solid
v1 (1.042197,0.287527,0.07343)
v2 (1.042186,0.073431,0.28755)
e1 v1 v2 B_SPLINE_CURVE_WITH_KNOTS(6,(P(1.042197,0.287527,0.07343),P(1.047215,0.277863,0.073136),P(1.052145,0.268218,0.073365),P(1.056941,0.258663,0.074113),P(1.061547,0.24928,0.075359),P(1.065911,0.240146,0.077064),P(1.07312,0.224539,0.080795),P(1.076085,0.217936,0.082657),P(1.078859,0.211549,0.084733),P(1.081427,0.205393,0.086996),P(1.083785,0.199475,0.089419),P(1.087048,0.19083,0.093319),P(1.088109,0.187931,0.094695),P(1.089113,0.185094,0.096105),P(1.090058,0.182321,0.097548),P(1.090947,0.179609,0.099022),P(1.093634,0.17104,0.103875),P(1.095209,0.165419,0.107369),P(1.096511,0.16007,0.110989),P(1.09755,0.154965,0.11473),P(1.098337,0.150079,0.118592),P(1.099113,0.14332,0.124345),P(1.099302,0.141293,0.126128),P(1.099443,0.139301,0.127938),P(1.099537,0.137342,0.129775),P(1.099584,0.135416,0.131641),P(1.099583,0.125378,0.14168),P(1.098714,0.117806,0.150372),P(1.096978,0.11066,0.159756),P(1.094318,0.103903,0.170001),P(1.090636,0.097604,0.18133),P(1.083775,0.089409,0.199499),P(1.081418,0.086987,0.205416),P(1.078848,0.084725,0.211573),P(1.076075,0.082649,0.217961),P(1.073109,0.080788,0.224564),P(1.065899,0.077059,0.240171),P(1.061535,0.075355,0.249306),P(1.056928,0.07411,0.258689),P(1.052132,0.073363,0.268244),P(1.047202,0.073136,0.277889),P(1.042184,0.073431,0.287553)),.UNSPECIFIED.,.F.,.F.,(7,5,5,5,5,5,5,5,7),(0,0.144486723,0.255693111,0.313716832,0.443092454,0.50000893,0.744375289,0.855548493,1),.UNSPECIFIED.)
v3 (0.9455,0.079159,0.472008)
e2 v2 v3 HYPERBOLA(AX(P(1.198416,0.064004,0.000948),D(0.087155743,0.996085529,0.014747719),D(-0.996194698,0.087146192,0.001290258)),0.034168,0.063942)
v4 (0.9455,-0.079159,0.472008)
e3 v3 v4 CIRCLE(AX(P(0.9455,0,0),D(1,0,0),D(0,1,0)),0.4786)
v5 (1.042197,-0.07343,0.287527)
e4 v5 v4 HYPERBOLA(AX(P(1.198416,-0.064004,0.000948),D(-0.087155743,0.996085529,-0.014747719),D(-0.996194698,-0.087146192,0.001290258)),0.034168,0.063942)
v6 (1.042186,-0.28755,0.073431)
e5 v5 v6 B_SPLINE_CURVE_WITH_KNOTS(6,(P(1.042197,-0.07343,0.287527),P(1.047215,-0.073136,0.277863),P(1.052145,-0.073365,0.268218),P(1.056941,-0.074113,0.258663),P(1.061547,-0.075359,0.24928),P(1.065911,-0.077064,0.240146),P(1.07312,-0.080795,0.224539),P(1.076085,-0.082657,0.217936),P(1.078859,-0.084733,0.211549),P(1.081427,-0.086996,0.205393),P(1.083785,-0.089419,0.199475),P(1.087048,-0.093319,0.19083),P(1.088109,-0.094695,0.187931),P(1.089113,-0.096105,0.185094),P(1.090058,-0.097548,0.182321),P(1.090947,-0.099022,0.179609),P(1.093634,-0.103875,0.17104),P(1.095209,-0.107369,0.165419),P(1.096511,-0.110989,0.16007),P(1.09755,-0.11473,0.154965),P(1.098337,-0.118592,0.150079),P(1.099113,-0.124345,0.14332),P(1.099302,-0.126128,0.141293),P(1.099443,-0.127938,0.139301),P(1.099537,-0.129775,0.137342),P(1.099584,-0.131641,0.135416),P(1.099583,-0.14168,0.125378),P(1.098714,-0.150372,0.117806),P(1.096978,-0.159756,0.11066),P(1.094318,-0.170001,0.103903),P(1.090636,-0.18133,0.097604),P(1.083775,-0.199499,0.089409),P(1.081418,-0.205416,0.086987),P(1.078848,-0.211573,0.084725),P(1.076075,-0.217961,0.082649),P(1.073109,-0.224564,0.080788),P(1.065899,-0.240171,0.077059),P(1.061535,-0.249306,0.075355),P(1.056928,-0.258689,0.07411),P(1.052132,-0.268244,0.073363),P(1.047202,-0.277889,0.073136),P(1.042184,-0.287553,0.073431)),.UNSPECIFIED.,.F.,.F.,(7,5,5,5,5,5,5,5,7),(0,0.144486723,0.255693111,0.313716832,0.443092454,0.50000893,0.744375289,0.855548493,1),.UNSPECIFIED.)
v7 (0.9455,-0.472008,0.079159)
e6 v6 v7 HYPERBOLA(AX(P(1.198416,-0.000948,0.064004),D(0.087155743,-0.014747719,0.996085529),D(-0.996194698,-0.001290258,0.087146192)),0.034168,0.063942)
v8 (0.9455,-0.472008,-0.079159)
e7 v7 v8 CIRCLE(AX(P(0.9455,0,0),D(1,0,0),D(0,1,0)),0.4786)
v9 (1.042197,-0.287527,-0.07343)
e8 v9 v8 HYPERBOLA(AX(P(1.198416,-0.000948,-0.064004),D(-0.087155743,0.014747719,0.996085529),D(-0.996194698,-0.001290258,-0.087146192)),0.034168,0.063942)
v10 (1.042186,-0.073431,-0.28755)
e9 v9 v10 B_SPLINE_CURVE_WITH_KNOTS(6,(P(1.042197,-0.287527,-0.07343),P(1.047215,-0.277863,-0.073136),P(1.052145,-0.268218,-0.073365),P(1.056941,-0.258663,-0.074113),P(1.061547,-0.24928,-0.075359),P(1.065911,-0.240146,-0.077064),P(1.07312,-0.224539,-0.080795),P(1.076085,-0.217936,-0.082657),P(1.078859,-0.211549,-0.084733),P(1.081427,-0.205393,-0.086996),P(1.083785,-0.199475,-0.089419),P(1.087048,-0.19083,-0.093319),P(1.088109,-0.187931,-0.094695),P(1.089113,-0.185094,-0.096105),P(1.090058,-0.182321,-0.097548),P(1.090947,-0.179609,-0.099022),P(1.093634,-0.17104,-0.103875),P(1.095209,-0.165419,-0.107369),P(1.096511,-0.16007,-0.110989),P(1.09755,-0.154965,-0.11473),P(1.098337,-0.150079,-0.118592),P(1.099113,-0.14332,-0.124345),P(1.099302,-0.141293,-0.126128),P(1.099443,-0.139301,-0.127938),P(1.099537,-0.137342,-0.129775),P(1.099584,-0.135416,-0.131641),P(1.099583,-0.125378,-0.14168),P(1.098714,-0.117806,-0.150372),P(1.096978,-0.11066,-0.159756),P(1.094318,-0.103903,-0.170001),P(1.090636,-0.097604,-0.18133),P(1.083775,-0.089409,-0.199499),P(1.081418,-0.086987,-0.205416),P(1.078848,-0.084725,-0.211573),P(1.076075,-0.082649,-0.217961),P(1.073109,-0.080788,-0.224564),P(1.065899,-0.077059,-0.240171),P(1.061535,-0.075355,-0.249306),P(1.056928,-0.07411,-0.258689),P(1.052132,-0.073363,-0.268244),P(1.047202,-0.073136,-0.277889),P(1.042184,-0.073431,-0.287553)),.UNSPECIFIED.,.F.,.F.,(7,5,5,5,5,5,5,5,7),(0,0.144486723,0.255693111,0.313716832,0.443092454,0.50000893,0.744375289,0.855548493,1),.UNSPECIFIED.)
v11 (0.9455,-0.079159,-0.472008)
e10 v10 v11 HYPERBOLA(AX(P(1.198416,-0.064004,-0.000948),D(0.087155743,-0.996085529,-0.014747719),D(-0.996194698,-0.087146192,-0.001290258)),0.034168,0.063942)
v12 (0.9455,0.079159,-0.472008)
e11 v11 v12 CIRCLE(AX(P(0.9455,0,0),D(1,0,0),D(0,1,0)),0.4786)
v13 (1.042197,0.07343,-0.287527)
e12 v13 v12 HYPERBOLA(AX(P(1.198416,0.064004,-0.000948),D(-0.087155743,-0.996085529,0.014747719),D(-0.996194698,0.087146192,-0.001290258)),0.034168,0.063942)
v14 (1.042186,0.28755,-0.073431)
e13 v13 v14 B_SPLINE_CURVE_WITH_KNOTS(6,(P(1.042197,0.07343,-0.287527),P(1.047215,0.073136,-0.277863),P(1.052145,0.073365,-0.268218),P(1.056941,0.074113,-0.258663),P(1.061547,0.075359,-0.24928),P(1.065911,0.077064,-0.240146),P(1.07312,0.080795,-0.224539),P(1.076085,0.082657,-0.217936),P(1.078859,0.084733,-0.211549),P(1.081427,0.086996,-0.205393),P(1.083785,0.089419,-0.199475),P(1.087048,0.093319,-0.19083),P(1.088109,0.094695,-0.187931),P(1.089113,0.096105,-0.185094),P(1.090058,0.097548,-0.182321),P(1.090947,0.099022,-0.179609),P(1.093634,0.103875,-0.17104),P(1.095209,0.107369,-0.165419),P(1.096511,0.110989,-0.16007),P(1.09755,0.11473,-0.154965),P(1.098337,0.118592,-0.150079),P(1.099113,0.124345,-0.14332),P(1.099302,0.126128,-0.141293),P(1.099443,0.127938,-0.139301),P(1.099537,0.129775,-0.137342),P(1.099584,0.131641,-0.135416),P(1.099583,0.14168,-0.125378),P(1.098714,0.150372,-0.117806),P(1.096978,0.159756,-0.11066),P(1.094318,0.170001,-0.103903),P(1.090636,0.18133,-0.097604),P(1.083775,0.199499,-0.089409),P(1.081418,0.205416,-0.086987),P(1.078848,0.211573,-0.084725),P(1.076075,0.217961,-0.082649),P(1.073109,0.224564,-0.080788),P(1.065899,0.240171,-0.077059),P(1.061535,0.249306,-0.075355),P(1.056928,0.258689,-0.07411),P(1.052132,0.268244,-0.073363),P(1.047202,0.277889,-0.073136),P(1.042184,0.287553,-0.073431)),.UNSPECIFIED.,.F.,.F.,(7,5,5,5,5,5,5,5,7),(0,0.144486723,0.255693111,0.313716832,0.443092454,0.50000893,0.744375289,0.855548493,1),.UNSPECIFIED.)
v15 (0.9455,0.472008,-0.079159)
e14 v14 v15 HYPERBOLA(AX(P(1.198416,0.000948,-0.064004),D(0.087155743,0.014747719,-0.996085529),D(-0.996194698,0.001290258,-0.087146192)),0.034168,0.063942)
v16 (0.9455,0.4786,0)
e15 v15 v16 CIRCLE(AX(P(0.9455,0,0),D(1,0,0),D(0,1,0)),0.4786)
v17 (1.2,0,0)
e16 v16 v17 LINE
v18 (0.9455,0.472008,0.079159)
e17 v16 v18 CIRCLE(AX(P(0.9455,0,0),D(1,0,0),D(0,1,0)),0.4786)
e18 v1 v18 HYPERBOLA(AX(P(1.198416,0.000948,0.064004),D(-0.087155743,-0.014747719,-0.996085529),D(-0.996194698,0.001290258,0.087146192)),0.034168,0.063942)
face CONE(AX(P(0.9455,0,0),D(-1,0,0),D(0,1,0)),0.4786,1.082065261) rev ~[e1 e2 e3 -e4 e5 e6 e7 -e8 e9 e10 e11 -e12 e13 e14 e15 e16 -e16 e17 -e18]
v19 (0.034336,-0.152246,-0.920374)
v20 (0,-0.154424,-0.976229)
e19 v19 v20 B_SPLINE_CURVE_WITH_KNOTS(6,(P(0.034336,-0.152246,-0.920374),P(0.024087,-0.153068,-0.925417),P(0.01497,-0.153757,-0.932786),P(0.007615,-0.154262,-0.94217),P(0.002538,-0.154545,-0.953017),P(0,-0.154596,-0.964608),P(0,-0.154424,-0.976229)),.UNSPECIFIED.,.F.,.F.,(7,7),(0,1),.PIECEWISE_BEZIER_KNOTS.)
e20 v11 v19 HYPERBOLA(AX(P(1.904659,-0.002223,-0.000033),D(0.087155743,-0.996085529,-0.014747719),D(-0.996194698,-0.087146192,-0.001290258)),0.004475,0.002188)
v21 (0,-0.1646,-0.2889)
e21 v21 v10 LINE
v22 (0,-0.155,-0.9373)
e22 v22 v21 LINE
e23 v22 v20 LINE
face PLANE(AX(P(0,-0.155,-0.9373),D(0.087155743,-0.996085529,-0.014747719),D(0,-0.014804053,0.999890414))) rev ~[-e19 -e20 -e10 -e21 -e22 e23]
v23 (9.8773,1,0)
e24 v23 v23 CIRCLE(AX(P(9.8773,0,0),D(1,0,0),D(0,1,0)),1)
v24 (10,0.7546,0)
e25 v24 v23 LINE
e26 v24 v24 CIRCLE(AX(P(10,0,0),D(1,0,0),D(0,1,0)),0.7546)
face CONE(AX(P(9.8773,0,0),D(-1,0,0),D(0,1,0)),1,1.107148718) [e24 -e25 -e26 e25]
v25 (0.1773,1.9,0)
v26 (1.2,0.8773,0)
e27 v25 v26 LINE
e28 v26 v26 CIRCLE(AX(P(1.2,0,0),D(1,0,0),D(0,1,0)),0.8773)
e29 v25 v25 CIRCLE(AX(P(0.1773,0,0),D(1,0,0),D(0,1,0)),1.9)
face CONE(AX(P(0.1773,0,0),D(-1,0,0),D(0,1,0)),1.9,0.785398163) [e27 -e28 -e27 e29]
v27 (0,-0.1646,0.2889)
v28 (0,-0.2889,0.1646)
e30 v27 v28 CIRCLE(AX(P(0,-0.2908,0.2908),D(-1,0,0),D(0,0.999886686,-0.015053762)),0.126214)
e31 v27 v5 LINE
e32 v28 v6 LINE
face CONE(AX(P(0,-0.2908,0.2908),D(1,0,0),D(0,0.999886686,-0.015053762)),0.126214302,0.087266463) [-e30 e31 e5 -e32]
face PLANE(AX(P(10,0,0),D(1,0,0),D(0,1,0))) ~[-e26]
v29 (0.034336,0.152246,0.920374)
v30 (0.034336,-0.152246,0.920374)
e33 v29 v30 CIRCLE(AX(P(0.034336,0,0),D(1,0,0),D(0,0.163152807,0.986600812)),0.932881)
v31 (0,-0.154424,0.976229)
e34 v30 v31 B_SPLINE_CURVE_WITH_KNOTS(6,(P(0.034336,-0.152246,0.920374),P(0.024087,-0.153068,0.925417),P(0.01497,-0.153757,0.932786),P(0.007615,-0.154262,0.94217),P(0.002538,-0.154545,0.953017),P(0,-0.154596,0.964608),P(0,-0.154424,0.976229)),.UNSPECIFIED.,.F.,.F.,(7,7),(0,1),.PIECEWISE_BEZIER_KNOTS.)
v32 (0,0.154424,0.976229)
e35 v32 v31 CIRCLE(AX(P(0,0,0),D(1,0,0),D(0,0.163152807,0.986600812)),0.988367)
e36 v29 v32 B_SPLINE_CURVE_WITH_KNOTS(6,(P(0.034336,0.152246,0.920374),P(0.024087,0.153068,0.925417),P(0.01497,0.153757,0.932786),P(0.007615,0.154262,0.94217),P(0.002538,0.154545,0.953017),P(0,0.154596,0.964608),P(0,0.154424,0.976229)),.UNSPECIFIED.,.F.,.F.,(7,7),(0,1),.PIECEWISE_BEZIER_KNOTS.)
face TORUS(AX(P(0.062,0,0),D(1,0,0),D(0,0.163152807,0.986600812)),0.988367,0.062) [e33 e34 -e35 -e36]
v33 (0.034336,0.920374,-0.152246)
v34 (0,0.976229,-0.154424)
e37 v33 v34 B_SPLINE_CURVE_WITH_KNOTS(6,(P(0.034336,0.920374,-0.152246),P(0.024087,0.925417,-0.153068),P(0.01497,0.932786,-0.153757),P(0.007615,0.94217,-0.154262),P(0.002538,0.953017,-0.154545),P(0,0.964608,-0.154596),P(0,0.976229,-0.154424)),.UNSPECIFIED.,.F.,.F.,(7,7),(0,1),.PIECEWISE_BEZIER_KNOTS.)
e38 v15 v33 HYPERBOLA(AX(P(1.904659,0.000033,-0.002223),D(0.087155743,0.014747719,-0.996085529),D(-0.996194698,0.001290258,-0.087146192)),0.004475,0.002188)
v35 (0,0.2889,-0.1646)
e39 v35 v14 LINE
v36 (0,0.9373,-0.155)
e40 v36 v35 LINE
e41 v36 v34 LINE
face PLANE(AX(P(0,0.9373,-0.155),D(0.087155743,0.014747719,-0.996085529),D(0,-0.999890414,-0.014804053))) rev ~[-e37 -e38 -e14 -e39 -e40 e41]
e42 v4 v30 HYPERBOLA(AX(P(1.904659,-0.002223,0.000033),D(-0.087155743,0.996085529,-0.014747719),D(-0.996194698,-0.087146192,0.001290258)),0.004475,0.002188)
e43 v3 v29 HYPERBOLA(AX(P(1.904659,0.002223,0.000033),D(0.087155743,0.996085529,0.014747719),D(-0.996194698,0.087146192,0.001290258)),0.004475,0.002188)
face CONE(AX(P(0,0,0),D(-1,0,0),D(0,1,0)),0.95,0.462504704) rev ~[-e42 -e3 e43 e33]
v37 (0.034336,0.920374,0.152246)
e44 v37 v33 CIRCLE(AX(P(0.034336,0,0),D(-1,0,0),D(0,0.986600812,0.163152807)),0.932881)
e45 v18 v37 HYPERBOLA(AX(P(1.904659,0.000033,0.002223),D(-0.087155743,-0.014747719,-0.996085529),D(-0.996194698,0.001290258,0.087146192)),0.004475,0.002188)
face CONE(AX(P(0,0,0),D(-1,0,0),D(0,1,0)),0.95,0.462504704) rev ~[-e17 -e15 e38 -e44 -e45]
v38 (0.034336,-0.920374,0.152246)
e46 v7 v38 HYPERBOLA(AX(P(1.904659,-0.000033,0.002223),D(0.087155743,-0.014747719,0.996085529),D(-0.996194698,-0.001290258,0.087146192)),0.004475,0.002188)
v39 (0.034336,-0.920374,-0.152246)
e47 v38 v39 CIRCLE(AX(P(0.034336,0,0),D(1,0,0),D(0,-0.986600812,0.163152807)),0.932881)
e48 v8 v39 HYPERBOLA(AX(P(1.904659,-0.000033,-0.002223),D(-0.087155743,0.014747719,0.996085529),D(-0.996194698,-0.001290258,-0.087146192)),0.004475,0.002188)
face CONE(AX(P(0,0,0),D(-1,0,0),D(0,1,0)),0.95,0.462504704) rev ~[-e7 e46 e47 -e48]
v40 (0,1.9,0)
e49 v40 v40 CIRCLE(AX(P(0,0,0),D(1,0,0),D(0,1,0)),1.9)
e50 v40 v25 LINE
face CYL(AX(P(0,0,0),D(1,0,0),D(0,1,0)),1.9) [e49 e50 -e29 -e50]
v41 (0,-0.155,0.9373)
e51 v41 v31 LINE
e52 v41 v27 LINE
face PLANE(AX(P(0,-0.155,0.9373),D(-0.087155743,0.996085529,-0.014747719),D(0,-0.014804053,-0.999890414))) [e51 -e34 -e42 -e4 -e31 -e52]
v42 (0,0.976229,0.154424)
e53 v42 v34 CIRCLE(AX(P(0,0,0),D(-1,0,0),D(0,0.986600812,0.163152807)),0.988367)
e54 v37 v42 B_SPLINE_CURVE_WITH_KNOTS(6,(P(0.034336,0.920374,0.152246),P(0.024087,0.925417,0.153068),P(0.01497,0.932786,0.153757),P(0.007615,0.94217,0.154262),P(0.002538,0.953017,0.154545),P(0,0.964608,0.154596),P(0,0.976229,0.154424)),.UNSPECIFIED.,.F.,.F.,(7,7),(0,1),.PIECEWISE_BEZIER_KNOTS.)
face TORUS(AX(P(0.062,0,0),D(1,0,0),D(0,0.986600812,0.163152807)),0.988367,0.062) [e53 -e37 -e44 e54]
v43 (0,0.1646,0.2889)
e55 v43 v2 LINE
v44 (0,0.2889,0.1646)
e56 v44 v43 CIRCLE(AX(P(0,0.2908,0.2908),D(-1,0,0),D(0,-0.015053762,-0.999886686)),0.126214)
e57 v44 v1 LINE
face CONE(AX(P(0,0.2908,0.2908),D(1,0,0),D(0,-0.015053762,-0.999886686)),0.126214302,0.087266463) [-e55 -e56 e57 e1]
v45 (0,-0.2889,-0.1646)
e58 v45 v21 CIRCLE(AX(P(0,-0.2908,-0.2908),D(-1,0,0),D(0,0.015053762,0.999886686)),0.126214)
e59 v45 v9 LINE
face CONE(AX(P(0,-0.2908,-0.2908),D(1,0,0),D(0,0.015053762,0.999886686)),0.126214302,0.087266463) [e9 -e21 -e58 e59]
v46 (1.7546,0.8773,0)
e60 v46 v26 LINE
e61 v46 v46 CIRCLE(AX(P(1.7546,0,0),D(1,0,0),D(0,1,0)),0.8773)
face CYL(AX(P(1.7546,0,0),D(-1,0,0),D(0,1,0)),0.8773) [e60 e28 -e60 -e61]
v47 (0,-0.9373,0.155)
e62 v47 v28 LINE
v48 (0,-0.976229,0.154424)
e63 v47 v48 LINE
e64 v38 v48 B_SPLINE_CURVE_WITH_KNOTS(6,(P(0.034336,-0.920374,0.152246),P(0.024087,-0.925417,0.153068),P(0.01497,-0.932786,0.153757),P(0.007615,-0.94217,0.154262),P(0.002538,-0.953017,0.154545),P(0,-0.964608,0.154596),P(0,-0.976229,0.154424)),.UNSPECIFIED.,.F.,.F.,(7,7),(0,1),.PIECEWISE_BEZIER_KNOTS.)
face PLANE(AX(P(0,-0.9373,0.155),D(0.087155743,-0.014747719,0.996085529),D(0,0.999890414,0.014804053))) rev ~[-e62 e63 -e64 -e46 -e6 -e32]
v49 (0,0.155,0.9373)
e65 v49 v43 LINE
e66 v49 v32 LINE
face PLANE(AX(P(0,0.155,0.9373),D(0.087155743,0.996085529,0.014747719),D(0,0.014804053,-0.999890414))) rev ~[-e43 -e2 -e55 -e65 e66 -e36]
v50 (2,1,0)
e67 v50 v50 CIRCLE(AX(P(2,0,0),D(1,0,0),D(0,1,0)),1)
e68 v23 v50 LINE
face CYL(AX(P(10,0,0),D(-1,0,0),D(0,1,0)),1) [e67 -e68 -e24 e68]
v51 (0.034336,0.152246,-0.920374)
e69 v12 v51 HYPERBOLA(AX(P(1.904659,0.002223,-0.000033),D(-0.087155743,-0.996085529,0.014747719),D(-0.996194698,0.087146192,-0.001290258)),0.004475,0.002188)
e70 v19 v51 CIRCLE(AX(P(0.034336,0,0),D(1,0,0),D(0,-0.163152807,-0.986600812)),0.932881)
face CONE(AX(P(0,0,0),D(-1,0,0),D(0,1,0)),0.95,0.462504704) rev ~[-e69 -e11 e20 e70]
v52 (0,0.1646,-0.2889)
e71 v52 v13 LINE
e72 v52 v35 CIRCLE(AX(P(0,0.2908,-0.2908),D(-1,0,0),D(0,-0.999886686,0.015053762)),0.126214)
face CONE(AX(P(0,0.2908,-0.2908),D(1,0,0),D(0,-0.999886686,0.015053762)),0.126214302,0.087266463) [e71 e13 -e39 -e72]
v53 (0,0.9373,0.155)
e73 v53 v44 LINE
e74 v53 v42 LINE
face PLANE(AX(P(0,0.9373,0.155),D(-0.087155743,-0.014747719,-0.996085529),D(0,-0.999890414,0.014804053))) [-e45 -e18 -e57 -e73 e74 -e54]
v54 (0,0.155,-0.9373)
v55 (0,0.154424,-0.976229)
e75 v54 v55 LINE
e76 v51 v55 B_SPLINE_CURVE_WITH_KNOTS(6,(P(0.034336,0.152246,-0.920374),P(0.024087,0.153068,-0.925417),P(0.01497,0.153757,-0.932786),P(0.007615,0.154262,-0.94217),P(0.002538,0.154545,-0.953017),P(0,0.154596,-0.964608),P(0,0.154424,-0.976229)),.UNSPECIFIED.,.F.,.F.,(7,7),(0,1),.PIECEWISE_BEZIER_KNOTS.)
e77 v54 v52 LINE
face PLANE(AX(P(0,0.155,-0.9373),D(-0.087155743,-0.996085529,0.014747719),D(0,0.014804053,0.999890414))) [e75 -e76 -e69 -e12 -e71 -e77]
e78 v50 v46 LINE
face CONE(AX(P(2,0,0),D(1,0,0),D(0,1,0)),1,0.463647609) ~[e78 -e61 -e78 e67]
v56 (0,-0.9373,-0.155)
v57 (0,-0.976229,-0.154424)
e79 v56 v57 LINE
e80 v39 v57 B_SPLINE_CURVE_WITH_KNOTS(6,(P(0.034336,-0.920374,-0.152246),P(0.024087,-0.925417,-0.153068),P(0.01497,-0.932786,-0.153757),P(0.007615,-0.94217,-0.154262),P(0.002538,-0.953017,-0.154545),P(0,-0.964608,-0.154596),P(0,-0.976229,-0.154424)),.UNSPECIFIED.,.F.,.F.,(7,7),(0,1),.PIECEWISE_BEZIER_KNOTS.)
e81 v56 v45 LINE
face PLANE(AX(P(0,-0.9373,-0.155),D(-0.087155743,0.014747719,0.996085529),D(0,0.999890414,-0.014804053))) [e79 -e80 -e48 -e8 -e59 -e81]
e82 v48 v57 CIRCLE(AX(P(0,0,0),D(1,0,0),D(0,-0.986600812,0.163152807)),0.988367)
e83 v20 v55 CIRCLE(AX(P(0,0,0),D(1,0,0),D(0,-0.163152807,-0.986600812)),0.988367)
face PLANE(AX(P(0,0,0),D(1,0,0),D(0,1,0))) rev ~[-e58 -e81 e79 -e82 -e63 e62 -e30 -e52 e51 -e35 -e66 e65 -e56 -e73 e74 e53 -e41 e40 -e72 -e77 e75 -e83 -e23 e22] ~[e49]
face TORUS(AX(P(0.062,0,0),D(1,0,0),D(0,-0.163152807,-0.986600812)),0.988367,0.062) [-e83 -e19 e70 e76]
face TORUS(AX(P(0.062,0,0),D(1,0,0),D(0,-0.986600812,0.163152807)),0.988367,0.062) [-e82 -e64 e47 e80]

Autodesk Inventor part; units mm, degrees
ref_plane "YZ Plane" through (0, 0, 0) normal (1, 0, 0) x (0, 1, 0)
ref_plane "XZ Plane" through (0, 0, 0) normal (0, 1, 0) x (-1, 0, 0)
sketch "Skizze1" plane through (0, 0, 0) normal (0, 0, 1) x (1, 0, 0)
  line L0 (1.2, 0) -> (10, 0)
  line L1 (10, 0) -> (10, 1)
  line L2 (10, 1) -> (2, 1)
  line L3 (2, 1) -> (1.7546, 0.8773)
  line L4 (1.7546, 0.8773) -> (1.2, 0.8773)
  line L5 (0, 1.9) -> (0, 0.95)
  line L6 (0, 0.95) -> (0.9455, 0.4786)
  line L7 (0.9455, 0.4786) -> (1.2, 0)
  line L8 (-2, 0) -> (12, 0) projected
  line L9 (0, -0.38) -> (0, 2.28) projected
  line L10 (0, 1.9) -> (0.1773, 1.9)
  line L11 (0.1773, 1.9) -> (1.2, 0.8773)
  line L12 (2, 1) -> (1.0773, 1) construction
  dimension "d1" = 8
  dimension "d2" = 2
  dimension "d3" = 1.7546
  dimension "d4" = 1.9
  dimension "d5" = 26.5
  dimension "d6" = 62
  dimension "d7" = 1.2
  dimension "d8" = 0.2454
  dimension "d12" = 3.8
  dimension "d13" = 45
  dimension "d15" = 10
  dimension "d24" = 1.2
revolve "Körper" add sketch "Skizze1" angle 360 about axis through (1.2, 0, 0) along (1, 0, 0) contours L7 L6 L5 L10 L11 L4 L3 L2 L1 L0
sketch "Skizze2" plane through (0, 0, 0) normal (-1, 0, 0) x (0, 0, 1)
  line L0 (0, 0.95) -> (0, 0) construction
  line L1 (0, 0) -> (0.95, 0) construction
  arc A0 (0.285, 0) -> (0, 0.285) centre (0, 0) ccw construction
  arc A1 (0.3325, 0) -> (0, 0.3325) centre (0, 0) ccw construction
  arc A2 (0.9373, 0.155) -> (0.155, 0.9373) centre (0, 0) ccw
  line L2 (0, 0) -> (0.6718, 0.6718) construction
  line L3 (0.155, 0.9373) -> (0.1646, 0.2889)
  line L4 (0.9373, 0.155) -> (0.2889, 0.1646)
  arc A3 (0.155, 0.9373) -> (0, 0.95) centre (0, 0) ccw
  arc A4 (0.95, 0) -> (0.9373, 0.155) centre (0, 0) ccw
  line L5 (0, -2.66) -> (0, 2.66) projected
  line L6 (-2.66, 0) -> (2.66, 0) projected
  arc A5 (0.155, -0.9373) -> (0.9373, -0.155) centre (0, 0) ccw
  line L7 (0.155, -0.9373) -> (0.1646, -0.2889)
  line L8 (0.9373, -0.155) -> (0.2889, -0.1646)
  arc A6 (0, -0.95) -> (0.155, -0.9373) centre (0, 0) ccw
  arc A7 (0.9373, -0.155) -> (0.95, 0) centre (0, 0) ccw
  arc A8 (-0.155, 0.9373) -> (-0.9373, 0.155) centre (0, 0) ccw
  line L9 (-0.155, 0.9373) -> (-0.1646, 0.2889)
  line L10 (-0.9373, 0.155) -> (-0.2889, 0.1646)
  arc A9 (0, 0.95) -> (-0.155, 0.9373) centre (0, 0) ccw
  arc A10 (-0.9373, 0.155) -> (-0.95, 0) centre (0, 0) ccw
  arc A11 (-0.155, -0.9373) -> (0, -0.95) centre (0, 0) ccw
  arc A12 (-0.9373, -0.155) -> (-0.155, -0.9373) centre (0, 0) ccw
  arc A13 (-0.95, 0) -> (-0.9373, -0.155) centre (0, 0) ccw
  line L11 (-0.9373, -0.155) -> (-0.2889, -0.1646)
  line L12 (-0.155, -0.9373) -> (-0.1646, -0.2889)
  arc A14 (0.1646, 0.2889) -> (0.2889, 0.1646) centre (0.2908, 0.2908) ccw
  arc A15 (0.2889, -0.1646) -> (0.1646, -0.2889) centre (0.2908, -0.2908) ccw
  arc A16 (-0.2889, 0.1646) -> (-0.1646, 0.2889) centre (-0.2908, 0.2908) ccw
  arc A17 (-0.1646, -0.2889) -> (-0.2889, -0.1646) centre (-0.2908, -0.2908) ccw
  point P0 (0.6718, -0.6718)
  point P1 (-0.6718, 0.6718)
  point P2 (-0.6718, -0.6718)
  dimension "d17" = 0.57
  dimension "d18" = 0.665
  dimension "d19" = 1.9
  dimension "d20" = 45
  dimension "d21" = 0.155
extrude "Loch" add sketch "Skizze2" against normal up to next draft 5 contours L4 A14 L3 A2 | A5 L7 A15 L8 | L9 A16 L10 A8 | A12 L11 A17 L12
fillet "Rundung1" radius 0.062 4 edges at (0, 0.95, 0) (0, 0, -0.95) (0, -0.95, 0) (0, 0, 0.95)
thread "Gewinde" size "M2x0.4" class "6g" standard "ISO Metric profile" length 8
chamfer "Fase1" distance 0.2454 distance2 0.1227 1 edges at (10, -1, 0) measured on face at (10, -0.0858, 0.7069)
ref_plane "Work Plane2" through (3.35, 0, 0) normal (0, 0, -1) x (1, 0, 0)
equation "\"d1\" = GEL"
equation "\"d2\" = GD"
equation "\"d3\" = BDM"
equation "\"d4\" = SDM"
equation "\"d7\" = INTI"
equation "\"d8\" = GAL"
equation "\"d12\" = KOD"
equation "\"d13\" = 0.5 * SEWI"
equation "\"d15\" = NLG"
equation "\"d24\" = KOH"
equation "\"d17\" = 0.3 * SDM"
equation "\"d18\" = 0.35 * SDM"
equation "\"d19\" = SDM"
equation "\"d21\" = 0.5 * SBR"
equation "\"d23\" = 0.2 * SBR"
equation "\"d10\" = GEL"
equation "\"d25\" = -0.5 * SPD + 0.5 * GD"
equation "\"d26\" = 0.5 * GAL"
equation "\"NLG\" = 10"
equation "\"GEL\" = 8"
equation "\"GAL\" = 0.61345 * PTC"
equation "\"SPD\" = NND - 1.2269 * PTC"
equation "\"KOD\" = 3.8"
equation "\"KOH\" = 1.2"
equation "\"SBR\" = 0.31"
equation "\"INTI\" = 1.2"
equation "\"SDM\" = 1.9"
equation "\"GD\" = NND"
equation "\"BDM\" = NND - GAL"
equation "\"SEWI\" = 90deg"
equation "\"d9\" = SDM"
equation "\"GUL\" = 0.61345 * PTC"
equation "\"TOA\" = 30deg"
equation "\"EPV\" = 2.2"
equation "\"THREADDIA\" = 2"
equation "\"PTC\" = 0.4"
equation "\"NND\" = 2"
equation "\"GD1\" = THREADDIA - 1.2269 * PTC"
properties part number "ISO 7046-1 - M2 x 10 - 4.8 - H" material "Stahl"
